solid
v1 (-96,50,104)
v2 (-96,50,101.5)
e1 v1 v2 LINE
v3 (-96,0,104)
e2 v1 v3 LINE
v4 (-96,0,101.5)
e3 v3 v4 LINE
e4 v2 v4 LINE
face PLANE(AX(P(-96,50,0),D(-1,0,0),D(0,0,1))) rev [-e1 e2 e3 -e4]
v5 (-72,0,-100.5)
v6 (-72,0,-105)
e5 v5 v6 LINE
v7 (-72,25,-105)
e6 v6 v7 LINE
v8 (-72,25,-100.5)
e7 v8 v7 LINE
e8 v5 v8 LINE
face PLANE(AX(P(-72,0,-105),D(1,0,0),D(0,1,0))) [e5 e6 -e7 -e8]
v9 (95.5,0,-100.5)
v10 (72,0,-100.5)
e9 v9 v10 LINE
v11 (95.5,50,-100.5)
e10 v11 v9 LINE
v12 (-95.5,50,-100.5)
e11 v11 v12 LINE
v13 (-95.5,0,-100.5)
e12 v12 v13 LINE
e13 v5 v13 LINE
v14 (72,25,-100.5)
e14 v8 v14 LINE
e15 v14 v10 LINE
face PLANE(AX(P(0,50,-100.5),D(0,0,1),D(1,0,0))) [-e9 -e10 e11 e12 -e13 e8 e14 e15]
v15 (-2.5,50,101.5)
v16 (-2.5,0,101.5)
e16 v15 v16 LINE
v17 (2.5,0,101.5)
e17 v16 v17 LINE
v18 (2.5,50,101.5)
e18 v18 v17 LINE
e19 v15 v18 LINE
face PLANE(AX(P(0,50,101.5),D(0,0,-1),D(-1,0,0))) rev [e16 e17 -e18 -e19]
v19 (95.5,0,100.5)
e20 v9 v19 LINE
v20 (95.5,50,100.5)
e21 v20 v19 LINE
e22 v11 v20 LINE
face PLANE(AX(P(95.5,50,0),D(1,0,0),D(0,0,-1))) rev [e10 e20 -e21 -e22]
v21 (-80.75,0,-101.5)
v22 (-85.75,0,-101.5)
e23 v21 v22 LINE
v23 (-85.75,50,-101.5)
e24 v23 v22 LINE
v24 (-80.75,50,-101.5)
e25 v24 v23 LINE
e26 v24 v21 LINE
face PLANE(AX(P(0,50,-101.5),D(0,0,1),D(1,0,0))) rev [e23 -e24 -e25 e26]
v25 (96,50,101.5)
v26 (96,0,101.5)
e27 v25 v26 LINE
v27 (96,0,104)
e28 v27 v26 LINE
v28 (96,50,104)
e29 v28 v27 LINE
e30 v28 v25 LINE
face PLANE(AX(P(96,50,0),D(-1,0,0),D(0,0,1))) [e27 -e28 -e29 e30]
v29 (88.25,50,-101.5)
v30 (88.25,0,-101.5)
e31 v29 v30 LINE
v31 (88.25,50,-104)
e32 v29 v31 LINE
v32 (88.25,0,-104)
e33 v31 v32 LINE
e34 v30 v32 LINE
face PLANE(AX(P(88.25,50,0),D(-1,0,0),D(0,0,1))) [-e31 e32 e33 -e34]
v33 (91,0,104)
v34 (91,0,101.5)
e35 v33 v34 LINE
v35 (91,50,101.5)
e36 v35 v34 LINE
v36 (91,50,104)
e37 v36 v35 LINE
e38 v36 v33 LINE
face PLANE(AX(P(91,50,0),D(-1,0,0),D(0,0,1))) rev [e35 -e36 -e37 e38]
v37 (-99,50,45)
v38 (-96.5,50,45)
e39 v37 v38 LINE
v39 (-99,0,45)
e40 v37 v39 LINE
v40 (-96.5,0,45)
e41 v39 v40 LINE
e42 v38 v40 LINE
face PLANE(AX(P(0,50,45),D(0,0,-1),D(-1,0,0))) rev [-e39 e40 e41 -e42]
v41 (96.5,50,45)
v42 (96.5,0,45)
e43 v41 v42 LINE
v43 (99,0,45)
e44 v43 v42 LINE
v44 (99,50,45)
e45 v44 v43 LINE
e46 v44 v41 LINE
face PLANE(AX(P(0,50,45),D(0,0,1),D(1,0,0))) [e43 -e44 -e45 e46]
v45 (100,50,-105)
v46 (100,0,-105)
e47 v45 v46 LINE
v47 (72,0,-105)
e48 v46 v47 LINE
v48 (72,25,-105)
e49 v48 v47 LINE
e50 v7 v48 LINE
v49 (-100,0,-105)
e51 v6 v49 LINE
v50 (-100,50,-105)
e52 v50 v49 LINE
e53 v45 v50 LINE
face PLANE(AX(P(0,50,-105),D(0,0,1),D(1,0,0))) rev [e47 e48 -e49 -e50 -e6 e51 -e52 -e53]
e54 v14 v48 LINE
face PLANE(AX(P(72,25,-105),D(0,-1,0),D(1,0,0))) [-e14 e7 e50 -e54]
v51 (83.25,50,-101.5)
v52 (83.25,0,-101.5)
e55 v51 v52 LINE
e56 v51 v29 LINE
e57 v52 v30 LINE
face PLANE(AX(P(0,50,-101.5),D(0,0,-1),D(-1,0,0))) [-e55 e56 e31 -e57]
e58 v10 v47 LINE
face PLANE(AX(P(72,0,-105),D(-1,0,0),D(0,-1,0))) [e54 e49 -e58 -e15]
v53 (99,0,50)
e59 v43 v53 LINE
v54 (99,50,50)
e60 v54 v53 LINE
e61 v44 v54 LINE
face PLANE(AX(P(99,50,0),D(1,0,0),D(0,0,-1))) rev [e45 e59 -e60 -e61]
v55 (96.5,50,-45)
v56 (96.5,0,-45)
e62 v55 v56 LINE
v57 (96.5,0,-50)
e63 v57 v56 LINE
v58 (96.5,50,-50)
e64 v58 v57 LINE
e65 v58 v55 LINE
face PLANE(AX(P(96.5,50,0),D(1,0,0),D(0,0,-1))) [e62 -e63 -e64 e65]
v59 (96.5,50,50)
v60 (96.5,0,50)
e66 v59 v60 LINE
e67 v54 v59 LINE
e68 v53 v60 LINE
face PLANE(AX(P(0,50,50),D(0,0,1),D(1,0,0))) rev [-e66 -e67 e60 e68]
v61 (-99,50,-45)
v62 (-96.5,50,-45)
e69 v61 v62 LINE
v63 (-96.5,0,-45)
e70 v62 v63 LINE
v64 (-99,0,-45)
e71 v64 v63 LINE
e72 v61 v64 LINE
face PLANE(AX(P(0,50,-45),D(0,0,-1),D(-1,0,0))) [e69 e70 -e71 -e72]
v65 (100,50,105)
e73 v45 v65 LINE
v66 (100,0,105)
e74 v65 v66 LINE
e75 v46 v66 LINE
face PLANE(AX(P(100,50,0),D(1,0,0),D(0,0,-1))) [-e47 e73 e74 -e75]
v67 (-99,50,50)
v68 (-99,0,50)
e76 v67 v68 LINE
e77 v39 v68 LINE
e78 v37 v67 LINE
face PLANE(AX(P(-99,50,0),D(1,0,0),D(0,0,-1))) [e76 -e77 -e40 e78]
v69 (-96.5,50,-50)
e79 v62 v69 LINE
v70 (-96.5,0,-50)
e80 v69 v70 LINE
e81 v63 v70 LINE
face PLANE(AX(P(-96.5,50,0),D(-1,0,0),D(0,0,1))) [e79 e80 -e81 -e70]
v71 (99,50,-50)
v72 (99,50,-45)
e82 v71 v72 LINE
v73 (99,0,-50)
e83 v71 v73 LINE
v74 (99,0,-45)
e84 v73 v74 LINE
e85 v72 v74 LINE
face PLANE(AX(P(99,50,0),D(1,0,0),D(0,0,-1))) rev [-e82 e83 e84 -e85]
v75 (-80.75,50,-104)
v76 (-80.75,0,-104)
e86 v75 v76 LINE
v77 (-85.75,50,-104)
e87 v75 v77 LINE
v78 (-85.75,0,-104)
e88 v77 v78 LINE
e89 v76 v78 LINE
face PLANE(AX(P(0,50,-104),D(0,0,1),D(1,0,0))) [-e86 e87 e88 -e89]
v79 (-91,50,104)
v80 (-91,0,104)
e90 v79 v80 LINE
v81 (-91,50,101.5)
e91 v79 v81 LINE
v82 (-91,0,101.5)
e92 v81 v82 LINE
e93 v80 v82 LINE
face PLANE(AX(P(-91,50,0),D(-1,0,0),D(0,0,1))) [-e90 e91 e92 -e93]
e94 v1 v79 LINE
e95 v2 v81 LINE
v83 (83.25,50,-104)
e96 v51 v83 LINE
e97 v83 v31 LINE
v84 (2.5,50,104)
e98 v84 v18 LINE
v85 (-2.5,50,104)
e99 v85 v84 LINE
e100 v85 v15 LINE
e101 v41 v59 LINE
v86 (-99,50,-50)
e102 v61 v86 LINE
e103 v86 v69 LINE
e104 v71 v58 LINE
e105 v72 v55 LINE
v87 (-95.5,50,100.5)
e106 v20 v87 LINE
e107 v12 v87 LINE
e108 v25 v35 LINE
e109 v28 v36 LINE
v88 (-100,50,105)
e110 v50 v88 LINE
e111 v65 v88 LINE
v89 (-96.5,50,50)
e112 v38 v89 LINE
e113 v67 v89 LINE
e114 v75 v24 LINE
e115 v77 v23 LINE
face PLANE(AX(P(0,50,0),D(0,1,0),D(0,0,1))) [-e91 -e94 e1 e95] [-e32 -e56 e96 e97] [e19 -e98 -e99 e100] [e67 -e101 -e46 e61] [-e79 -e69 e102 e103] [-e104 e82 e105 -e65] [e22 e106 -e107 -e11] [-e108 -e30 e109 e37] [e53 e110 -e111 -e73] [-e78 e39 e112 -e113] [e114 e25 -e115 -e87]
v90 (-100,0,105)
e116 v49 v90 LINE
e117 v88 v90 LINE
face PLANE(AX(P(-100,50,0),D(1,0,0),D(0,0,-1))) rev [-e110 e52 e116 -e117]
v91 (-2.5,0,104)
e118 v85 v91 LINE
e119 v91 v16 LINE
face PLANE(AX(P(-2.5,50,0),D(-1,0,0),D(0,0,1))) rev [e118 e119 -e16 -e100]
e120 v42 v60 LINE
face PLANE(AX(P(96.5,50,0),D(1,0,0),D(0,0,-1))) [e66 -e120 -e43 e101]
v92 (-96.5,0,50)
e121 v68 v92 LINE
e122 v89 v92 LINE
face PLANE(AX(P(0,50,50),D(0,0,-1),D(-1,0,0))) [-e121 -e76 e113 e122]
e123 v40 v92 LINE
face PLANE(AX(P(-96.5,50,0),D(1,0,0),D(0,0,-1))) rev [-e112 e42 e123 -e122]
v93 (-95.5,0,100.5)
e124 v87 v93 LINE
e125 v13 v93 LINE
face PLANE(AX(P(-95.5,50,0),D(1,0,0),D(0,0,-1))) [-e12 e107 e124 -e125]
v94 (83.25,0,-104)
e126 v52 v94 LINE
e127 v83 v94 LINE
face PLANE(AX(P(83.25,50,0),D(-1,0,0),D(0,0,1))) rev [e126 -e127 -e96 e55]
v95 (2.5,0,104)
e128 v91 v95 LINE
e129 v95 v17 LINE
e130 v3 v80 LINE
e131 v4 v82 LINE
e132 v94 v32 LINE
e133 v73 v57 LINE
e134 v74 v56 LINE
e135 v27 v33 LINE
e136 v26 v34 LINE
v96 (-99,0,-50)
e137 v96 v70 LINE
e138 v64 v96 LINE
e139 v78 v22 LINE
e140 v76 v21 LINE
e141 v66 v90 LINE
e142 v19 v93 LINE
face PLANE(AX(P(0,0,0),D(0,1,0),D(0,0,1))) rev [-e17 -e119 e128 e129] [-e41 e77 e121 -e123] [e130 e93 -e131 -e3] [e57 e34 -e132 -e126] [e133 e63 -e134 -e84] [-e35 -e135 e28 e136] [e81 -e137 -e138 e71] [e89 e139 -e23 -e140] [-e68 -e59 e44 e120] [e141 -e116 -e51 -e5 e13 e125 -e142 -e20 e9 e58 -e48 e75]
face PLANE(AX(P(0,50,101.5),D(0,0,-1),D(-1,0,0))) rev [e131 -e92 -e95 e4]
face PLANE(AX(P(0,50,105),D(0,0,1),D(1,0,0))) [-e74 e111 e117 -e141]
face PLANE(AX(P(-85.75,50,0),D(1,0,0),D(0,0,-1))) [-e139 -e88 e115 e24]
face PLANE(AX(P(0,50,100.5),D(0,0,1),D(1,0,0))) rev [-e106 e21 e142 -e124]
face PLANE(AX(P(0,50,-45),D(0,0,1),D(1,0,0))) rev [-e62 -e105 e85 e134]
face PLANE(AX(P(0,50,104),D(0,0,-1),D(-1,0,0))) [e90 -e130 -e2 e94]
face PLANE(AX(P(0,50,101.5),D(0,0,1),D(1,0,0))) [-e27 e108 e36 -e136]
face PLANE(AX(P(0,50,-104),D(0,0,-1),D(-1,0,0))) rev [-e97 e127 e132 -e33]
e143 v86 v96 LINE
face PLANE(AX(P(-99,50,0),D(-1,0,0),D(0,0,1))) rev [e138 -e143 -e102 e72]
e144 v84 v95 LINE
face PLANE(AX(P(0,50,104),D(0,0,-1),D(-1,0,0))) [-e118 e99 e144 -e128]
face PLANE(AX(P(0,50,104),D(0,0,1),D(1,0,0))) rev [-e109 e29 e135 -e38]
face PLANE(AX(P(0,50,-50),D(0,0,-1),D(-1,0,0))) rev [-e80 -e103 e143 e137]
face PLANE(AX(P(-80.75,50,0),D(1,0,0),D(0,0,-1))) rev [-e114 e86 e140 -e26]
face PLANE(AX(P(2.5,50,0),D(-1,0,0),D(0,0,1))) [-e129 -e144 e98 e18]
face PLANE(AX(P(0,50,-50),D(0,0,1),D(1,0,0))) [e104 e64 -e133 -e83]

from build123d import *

# Parameters (mm, degrees)
SKETCH1_W        = 200
SKETCH1_H        = 210
SKETCH1_W_2      = 191
SKETCH1_H_2      = 201
SKETCH1_W_3      = 5
SKETCH1_H_3      = 2.5
SKETCH1_W_4      = 2.5
SKETCH1_H_4      = 5
MAINBODY_DEPTH   = 50
IRHOLE_START     = -4.5
IRHOLE_OUTLINE_W = 144
IRHOLE_OUTLINE_H = 25
IRHOLE_DEPTH     = 4.5


# Read off the part's stored shape, not the designer's step: IRHole
with BuildPart() as part:
    # Sketch1 → MainBody (new body)
    with BuildSketch(Plane(origin=(0, 0, 0), x_dir=(1, 0, 0), z_dir=(0, 1, 0))):
        Rectangle(SKETCH1_W, SKETCH1_H)
        Rectangle(SKETCH1_W_2, SKETCH1_H_2, mode=Mode.SUBTRACT)
        with Locations((93.5, -102.75)):
            Rectangle(SKETCH1_W_3, SKETCH1_H_3, mode=Mode.SUBTRACT)
        with Locations((0, -102.75)):
            Rectangle(SKETCH1_W_3, SKETCH1_H_3, mode=Mode.SUBTRACT)
        with Locations((-93.5, -102.75)):
            Rectangle(SKETCH1_W_3, SKETCH1_H_3, mode=Mode.SUBTRACT)
        with Locations((-83.25, 102.75)):
            Rectangle(SKETCH1_W_3, SKETCH1_H_3, mode=Mode.SUBTRACT)
        with Locations((85.75, 102.75)):
            Rectangle(SKETCH1_W_3, SKETCH1_H_3, mode=Mode.SUBTRACT)
        with Locations((97.75, -47.5)):
            Rectangle(SKETCH1_W_4, SKETCH1_H_4, mode=Mode.SUBTRACT)
        with Locations((97.75, 47.5)):
            Rectangle(SKETCH1_W_4, SKETCH1_H_4, mode=Mode.SUBTRACT)
        with Locations((-97.75, -47.5)):
            Rectangle(SKETCH1_W_4, SKETCH1_H_4, mode=Mode.SUBTRACT)
        with Locations((-97.75, 47.5)):
            Rectangle(SKETCH1_W_4, SKETCH1_H_4, mode=Mode.SUBTRACT)
    extrude(amount=MAINBODY_DEPTH)

    # IRHole outline → IRHole (cut)
    with BuildSketch(Plane(origin=(0, 0, -105), x_dir=(-1, 0, 0), z_dir=(0, 0, -1)).offset(IRHOLE_START)):
        with Locations((0, 12.5)):
            Rectangle(IRHOLE_OUTLINE_W, IRHOLE_OUTLINE_H)
    extrude(amount=IRHOLE_DEPTH, mode=Mode.SUBTRACT)


solid = part.part
